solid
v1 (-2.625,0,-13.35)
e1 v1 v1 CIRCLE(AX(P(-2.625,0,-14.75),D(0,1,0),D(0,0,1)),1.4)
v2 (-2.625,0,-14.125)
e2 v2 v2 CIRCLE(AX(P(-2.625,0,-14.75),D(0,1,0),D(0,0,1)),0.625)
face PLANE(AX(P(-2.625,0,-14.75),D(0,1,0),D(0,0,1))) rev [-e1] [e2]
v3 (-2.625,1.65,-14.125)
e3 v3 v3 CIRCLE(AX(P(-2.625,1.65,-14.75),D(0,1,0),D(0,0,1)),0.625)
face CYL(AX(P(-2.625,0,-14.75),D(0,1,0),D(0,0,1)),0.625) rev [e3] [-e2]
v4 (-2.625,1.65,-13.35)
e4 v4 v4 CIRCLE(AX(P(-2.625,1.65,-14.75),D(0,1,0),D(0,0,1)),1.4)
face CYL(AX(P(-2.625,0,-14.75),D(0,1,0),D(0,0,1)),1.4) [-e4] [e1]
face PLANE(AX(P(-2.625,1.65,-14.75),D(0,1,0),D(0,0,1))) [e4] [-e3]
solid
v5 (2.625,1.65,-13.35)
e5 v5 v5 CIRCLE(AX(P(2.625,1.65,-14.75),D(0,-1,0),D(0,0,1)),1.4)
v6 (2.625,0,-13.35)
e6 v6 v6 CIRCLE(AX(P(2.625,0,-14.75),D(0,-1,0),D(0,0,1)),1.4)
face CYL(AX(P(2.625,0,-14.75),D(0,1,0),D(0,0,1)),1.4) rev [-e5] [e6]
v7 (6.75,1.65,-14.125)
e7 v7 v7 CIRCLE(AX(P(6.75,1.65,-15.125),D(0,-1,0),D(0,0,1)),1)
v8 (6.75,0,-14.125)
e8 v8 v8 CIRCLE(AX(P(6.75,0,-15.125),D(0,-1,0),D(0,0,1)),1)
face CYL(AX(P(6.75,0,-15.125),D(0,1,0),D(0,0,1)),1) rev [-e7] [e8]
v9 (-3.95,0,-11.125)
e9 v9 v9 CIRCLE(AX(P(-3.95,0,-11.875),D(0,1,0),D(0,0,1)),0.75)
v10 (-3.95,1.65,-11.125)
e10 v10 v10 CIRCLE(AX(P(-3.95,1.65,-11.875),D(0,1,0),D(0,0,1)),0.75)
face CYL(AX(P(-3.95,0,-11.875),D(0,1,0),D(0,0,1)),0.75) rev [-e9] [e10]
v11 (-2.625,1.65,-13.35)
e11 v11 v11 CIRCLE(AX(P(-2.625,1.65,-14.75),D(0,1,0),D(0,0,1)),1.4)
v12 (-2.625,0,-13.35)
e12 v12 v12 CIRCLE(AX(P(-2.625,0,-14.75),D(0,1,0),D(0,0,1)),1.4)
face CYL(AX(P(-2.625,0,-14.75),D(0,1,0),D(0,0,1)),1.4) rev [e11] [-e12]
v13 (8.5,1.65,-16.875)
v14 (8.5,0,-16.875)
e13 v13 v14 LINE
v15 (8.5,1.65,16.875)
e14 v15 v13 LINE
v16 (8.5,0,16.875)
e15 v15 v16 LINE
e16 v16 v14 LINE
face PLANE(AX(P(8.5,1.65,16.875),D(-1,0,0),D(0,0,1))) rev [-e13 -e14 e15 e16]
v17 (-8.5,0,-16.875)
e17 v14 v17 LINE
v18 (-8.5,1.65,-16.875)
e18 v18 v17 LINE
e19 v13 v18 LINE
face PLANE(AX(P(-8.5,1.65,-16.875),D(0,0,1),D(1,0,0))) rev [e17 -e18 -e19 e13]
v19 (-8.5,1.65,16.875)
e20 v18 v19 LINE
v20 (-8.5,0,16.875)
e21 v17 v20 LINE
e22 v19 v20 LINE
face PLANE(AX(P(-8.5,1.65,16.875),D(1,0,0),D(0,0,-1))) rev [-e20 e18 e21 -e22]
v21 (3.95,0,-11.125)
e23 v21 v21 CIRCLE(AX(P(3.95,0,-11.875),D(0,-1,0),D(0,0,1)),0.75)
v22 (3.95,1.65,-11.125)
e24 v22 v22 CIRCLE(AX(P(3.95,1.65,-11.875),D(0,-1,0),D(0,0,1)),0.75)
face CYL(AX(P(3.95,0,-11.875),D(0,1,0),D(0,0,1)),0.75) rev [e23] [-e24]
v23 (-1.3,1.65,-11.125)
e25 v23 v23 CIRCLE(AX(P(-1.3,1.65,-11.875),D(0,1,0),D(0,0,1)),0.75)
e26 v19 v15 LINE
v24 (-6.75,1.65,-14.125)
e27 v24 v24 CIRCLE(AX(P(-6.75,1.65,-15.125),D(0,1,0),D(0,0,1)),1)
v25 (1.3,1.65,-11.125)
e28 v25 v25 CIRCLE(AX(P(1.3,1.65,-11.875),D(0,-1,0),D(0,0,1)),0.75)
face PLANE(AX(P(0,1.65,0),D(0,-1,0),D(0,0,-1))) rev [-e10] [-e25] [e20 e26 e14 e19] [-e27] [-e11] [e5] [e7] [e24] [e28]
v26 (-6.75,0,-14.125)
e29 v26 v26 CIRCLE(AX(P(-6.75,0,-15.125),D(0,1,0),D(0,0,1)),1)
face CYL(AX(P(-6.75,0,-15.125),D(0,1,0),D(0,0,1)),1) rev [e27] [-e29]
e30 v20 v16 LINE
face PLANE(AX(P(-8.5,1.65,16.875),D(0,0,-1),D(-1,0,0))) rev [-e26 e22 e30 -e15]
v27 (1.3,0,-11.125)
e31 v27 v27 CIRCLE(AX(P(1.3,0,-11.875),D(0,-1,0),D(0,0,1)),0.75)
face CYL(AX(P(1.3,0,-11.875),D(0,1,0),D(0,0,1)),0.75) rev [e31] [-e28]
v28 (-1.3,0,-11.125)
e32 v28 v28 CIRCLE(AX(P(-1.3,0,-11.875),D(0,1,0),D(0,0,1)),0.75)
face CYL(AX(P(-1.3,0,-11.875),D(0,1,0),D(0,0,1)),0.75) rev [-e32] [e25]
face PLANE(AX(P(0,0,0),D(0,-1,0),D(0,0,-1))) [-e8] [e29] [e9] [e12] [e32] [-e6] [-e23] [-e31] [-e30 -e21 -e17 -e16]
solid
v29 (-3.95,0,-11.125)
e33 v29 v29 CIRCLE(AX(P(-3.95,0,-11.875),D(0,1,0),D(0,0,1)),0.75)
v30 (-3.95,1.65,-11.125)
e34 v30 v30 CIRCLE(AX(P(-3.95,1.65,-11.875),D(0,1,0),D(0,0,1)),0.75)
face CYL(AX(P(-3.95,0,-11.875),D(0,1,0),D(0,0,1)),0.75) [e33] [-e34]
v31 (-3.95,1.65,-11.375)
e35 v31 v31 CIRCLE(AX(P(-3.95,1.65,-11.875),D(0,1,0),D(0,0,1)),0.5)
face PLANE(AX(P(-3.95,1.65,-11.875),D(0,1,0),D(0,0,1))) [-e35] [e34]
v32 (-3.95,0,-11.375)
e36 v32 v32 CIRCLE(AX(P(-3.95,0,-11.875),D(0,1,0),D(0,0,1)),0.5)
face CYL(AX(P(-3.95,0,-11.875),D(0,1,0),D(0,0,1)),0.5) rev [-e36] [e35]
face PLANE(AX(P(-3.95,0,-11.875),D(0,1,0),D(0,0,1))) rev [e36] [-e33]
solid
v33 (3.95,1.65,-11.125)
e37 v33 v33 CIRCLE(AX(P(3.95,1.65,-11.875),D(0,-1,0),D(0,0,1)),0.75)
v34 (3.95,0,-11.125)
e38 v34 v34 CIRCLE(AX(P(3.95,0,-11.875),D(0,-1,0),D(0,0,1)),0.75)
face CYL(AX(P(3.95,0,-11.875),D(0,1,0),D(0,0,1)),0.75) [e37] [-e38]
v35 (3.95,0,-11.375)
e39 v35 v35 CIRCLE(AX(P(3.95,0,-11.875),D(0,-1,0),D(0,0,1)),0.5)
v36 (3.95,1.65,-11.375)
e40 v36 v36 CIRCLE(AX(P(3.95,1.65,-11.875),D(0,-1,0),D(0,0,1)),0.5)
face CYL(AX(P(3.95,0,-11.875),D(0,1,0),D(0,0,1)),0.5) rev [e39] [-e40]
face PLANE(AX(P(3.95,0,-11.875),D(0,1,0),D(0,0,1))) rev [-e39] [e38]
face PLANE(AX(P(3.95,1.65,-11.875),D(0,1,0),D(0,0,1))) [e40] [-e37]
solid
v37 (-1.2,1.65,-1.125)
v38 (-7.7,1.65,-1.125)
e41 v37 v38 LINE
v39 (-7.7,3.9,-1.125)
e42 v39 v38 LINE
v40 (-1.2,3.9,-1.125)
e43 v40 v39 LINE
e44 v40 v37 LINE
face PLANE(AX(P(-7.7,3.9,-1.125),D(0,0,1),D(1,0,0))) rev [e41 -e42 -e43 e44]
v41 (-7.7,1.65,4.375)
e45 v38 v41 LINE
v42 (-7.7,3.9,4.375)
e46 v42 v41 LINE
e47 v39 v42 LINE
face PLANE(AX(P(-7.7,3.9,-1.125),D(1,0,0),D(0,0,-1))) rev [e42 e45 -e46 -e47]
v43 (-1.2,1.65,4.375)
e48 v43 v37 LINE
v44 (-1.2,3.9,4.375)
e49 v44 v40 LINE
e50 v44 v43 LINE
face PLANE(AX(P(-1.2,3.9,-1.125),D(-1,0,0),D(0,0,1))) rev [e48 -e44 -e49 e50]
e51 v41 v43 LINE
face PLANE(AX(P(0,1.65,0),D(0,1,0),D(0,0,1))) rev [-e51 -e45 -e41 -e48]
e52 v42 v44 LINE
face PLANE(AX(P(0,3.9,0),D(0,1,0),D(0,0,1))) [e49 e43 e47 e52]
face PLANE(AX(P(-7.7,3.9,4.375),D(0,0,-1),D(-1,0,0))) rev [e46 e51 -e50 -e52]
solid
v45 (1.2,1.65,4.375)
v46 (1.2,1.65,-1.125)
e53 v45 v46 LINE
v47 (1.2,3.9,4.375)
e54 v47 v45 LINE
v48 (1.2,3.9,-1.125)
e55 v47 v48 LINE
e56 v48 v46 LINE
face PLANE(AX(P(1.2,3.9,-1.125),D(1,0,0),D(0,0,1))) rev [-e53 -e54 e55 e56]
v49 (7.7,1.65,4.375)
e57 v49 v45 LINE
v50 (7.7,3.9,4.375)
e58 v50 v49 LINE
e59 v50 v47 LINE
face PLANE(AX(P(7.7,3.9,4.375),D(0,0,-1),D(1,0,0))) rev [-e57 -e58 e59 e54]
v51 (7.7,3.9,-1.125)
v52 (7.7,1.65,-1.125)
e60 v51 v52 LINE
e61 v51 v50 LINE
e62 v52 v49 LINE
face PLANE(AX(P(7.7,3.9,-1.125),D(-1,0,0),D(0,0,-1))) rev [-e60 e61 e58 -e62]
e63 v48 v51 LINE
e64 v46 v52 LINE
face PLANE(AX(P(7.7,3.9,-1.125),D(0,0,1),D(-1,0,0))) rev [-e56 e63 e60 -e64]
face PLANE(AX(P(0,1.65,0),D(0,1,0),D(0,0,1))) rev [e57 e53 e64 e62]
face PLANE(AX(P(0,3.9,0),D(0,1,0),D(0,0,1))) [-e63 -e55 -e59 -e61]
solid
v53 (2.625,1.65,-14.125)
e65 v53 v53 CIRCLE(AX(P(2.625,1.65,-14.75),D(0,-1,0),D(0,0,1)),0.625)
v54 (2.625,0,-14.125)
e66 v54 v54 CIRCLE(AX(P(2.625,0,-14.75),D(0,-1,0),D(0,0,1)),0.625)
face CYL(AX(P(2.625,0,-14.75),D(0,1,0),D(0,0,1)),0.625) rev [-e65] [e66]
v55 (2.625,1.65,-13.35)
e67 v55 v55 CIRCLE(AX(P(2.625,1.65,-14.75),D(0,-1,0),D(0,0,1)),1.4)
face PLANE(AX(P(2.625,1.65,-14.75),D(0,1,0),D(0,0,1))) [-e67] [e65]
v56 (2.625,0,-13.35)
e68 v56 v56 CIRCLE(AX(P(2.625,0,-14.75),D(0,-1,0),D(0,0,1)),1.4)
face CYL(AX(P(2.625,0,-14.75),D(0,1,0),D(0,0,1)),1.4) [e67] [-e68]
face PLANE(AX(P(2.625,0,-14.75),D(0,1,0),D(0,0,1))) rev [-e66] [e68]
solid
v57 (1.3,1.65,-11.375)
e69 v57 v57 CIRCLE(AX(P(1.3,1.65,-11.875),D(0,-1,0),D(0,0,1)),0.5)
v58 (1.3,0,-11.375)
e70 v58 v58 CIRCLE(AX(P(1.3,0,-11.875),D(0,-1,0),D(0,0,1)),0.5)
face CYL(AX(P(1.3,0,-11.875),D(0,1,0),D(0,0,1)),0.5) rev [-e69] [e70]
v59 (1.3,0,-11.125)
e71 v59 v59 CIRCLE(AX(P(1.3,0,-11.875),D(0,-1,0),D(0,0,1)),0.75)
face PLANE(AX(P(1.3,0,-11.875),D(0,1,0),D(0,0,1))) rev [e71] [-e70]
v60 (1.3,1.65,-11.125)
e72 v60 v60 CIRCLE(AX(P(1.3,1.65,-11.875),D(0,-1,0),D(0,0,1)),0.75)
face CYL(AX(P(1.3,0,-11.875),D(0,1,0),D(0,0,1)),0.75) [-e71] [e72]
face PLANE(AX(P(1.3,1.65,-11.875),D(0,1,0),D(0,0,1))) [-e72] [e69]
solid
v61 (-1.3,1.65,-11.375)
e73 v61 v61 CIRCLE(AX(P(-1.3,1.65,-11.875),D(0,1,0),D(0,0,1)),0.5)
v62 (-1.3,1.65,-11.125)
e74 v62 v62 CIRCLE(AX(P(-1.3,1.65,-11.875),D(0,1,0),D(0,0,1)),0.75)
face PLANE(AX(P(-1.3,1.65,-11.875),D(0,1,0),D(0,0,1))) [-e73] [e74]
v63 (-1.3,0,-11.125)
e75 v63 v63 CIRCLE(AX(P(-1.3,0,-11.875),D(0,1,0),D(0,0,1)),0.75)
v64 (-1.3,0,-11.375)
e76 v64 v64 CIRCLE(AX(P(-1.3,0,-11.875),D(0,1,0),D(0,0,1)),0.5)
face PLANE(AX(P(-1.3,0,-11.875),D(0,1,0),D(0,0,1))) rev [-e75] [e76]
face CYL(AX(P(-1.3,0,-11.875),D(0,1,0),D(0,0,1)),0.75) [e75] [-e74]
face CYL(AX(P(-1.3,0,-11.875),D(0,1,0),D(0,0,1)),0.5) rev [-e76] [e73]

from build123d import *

# Parameters (mm, degrees)
PCB_SKETCH_W                     = 17
PCB_SKETCH_H                     = 33.75
PCB_EXTRUDE_DEPTH                = 1.65
THROUGH_HOLE_SKETCH_R            = 1.4
THROUGH_HOLE_SKETCH_R_2          = 0.625
THROUGH_HOLE_SKETCH_R_3          = 0.75
THROUGH_HOLE_SKETCH_R_4          = 0.5
THROUGH_HOLE_CUT_DEPTH           = 19.966763693
MOUNTING_HOLES_SKETCH_R          = 1
MOUNTING_HOLE_CUT_DEPTH          = 1.65
HOLES_MIRROR_OUTLINE_R           = 1.4
HOLES_MIRROR_OUTLINE_R_2         = 0.75
HOLES_MIRROR_OUTLINE_R_3         = 1
HOLES_MIRROR_DEPTH               = 1.65
THROUGH_HOLE_EXTRUDE_OUTLINE_R   = 0.75
THROUGH_HOLE_EXTRUDE_OUTLINE_R_2 = 0.5
THROUGH_HOLE_EXTRUDE_OUTLINE_R_3 = 1.4
THROUGH_HOLE_EXTRUDE_OUTLINE_R_4 = 0.625
THROUGH_HOLE_EXTRUDE_DEPTH       = 1.65
MOSFET_SKETCH_W                  = 6.5
MOSFET_SKETCH_H                  = 5.5
MOSFET_EXTRUDE_DEPTH             = 2.25


# Read off the part's stored shape, not the designer's step: Holes Mirror, Through Hole Extrude
with BuildPart() as part:
    # PCB Sketch → PCB Extrude (new body)
    with BuildSketch(Plane(origin=(0, 0, 0), x_dir=(1, 0, 0), z_dir=(0, 1, 0))):
        Rectangle(PCB_SKETCH_W, PCB_SKETCH_H)
    extrude(amount=PCB_EXTRUDE_DEPTH)

    # Through Hole Sketch → Through Hole Cut (cut, through all)
    # profile 1 of 4: a face of its own
    with BuildSketch(Plane(origin=(0, 1.65, 0), x_dir=(1, 0, 0), z_dir=(0, 1, 0))):
        with Locations(Location((-2.625, 14.75, 0), (0, 0, 270))):
            Circle(THROUGH_HOLE_SKETCH_R)
        with Locations((-2.625, 14.75)):
            Circle(THROUGH_HOLE_SKETCH_R_2, mode=Mode.SUBTRACT)
    # profile 2 of 4: a face of its own
    with BuildSketch(Plane(origin=(0, 1.65, 0), x_dir=(1, 0, 0), z_dir=(0, 1, 0))):
        with Locations((-2.625, 14.75)):
            Circle(THROUGH_HOLE_SKETCH_R_2)
    # profile 3 of 4: a face of its own
    with BuildSketch(Plane(origin=(0, 1.65, 0), x_dir=(1, 0, 0), z_dir=(0, 1, 0))):
        with Locations(Location((-1.3, 11.875, 0), (0, 0, 270))):
            Circle(THROUGH_HOLE_SKETCH_R_3)
        with Locations((-1.3, 11.875)):
            Circle(THROUGH_HOLE_SKETCH_R_4, mode=Mode.SUBTRACT)
    # profile 4 of 4: a face of its own
    with BuildSketch(Plane(origin=(0, 1.65, 0), x_dir=(1, 0, 0), z_dir=(0, 1, 0))):
        with Locations(Location((-3.95, 11.875, 0), (0, 0, 270))):
            Circle(THROUGH_HOLE_SKETCH_R_3)
    extrude(amount=-THROUGH_HOLE_CUT_DEPTH, mode=Mode.SUBTRACT)


with BuildPart() as through_hole_cut_kept_piece:
    # of the separate pieces the step leaves, the one the design keeps (through_hole_cut_pieces_kept)
    add(part.part.solids().sort_by_distance((-8.5, 0, 16.875))[0])

    # Mounting Holes Sketch → Mounting Hole Cut (cut)
    with BuildSketch(Plane(origin=(0, 1.65, 0), x_dir=(1, 0, 0), z_dir=(0, 1, 0))):
        with Locations(Location((-6.75, 15.125, 0), (0, 0, 270))):
            Circle(MOUNTING_HOLES_SKETCH_R)
    extrude(amount=-MOUNTING_HOLE_CUT_DEPTH, mode=Mode.SUBTRACT)

    # Holes Mirror outline → Holes Mirror (cut)
    with BuildSketch(Plane(origin=(0, 0, 0), x_dir=(1, 0, 0), z_dir=(0, 1, 0))):
        with Locations((2.625, 14.75)):
            Circle(HOLES_MIRROR_OUTLINE_R)
        with Locations((1.3, 11.875)):
            Circle(HOLES_MIRROR_OUTLINE_R_2)
        with Locations((3.95, 11.875)):
            Circle(HOLES_MIRROR_OUTLINE_R_2)
        with Locations((6.75, 15.125)):
            Circle(HOLES_MIRROR_OUTLINE_R_3)
    extrude(amount=HOLES_MIRROR_DEPTH, mode=Mode.SUBTRACT)


with BuildPart() as body_2:
    # Through Hole Extrude outline → Through Hole Extrude (new body)
    # profile 1 of 3: a face of its own
    with BuildSketch(Plane(origin=(0, 0, 0), x_dir=(1, 0, 0), z_dir=(0, 1, 0))):
        with Locations((-3.95, 11.875)):
            Circle(THROUGH_HOLE_EXTRUDE_OUTLINE_R)
        with Locations((-3.95, 11.875)):
            Circle(THROUGH_HOLE_EXTRUDE_OUTLINE_R_2, mode=Mode.SUBTRACT)
    # profile 2 of 3: a face of its own
    with BuildSketch(Plane(origin=(0, 0, 0), x_dir=(1, 0, 0), z_dir=(0, 1, 0))):
        with Locations((-1.3, 11.875)):
            Circle(THROUGH_HOLE_EXTRUDE_OUTLINE_R)
        with Locations((-1.3, 11.875)):
            Circle(THROUGH_HOLE_EXTRUDE_OUTLINE_R_2, mode=Mode.SUBTRACT)
    # profile 3 of 3: a face of its own
    with BuildSketch(Plane(origin=(0, 0, 0), x_dir=(1, 0, 0), z_dir=(0, 1, 0))):
        with Locations((-2.625, 14.75)):
            Circle(THROUGH_HOLE_EXTRUDE_OUTLINE_R_3)
        with Locations((-2.625, 14.75)):
            Circle(THROUGH_HOLE_EXTRUDE_OUTLINE_R_4, mode=Mode.SUBTRACT)
    extrude(amount=THROUGH_HOLE_EXTRUDE_DEPTH)


with BuildPart() as body_3:
    # Mosfet Sketch → Mosfet Extrude (new body)
    with BuildSketch(Plane(origin=(0, 1.65, 0), x_dir=(1, 0, 0), z_dir=(0, 1, 0))):
        with Locations((-4.45, -1.625)):
            Rectangle(MOSFET_SKETCH_W, MOSFET_SKETCH_H)
    extrude(amount=MOSFET_EXTRUDE_DEPTH)


with BuildPart() as body_4:
    # Bodies Mirror: mirrored copy
    add(body_2.part.mirror(Plane(origin=(0, 0, 0), x_dir=(0, 0, 1), z_dir=(1, 0, 0))))


with BuildPart() as body_5:
    # Bodies Mirror 2: mirrored copy
    add(body_3.part.mirror(Plane(origin=(0, 0, 0), x_dir=(0, 0, 1), z_dir=(1, 0, 0))))


solid = Compound([through_hole_cut_kept_piece.part, body_2.part, body_3.part, body_4.part, body_5.part])
